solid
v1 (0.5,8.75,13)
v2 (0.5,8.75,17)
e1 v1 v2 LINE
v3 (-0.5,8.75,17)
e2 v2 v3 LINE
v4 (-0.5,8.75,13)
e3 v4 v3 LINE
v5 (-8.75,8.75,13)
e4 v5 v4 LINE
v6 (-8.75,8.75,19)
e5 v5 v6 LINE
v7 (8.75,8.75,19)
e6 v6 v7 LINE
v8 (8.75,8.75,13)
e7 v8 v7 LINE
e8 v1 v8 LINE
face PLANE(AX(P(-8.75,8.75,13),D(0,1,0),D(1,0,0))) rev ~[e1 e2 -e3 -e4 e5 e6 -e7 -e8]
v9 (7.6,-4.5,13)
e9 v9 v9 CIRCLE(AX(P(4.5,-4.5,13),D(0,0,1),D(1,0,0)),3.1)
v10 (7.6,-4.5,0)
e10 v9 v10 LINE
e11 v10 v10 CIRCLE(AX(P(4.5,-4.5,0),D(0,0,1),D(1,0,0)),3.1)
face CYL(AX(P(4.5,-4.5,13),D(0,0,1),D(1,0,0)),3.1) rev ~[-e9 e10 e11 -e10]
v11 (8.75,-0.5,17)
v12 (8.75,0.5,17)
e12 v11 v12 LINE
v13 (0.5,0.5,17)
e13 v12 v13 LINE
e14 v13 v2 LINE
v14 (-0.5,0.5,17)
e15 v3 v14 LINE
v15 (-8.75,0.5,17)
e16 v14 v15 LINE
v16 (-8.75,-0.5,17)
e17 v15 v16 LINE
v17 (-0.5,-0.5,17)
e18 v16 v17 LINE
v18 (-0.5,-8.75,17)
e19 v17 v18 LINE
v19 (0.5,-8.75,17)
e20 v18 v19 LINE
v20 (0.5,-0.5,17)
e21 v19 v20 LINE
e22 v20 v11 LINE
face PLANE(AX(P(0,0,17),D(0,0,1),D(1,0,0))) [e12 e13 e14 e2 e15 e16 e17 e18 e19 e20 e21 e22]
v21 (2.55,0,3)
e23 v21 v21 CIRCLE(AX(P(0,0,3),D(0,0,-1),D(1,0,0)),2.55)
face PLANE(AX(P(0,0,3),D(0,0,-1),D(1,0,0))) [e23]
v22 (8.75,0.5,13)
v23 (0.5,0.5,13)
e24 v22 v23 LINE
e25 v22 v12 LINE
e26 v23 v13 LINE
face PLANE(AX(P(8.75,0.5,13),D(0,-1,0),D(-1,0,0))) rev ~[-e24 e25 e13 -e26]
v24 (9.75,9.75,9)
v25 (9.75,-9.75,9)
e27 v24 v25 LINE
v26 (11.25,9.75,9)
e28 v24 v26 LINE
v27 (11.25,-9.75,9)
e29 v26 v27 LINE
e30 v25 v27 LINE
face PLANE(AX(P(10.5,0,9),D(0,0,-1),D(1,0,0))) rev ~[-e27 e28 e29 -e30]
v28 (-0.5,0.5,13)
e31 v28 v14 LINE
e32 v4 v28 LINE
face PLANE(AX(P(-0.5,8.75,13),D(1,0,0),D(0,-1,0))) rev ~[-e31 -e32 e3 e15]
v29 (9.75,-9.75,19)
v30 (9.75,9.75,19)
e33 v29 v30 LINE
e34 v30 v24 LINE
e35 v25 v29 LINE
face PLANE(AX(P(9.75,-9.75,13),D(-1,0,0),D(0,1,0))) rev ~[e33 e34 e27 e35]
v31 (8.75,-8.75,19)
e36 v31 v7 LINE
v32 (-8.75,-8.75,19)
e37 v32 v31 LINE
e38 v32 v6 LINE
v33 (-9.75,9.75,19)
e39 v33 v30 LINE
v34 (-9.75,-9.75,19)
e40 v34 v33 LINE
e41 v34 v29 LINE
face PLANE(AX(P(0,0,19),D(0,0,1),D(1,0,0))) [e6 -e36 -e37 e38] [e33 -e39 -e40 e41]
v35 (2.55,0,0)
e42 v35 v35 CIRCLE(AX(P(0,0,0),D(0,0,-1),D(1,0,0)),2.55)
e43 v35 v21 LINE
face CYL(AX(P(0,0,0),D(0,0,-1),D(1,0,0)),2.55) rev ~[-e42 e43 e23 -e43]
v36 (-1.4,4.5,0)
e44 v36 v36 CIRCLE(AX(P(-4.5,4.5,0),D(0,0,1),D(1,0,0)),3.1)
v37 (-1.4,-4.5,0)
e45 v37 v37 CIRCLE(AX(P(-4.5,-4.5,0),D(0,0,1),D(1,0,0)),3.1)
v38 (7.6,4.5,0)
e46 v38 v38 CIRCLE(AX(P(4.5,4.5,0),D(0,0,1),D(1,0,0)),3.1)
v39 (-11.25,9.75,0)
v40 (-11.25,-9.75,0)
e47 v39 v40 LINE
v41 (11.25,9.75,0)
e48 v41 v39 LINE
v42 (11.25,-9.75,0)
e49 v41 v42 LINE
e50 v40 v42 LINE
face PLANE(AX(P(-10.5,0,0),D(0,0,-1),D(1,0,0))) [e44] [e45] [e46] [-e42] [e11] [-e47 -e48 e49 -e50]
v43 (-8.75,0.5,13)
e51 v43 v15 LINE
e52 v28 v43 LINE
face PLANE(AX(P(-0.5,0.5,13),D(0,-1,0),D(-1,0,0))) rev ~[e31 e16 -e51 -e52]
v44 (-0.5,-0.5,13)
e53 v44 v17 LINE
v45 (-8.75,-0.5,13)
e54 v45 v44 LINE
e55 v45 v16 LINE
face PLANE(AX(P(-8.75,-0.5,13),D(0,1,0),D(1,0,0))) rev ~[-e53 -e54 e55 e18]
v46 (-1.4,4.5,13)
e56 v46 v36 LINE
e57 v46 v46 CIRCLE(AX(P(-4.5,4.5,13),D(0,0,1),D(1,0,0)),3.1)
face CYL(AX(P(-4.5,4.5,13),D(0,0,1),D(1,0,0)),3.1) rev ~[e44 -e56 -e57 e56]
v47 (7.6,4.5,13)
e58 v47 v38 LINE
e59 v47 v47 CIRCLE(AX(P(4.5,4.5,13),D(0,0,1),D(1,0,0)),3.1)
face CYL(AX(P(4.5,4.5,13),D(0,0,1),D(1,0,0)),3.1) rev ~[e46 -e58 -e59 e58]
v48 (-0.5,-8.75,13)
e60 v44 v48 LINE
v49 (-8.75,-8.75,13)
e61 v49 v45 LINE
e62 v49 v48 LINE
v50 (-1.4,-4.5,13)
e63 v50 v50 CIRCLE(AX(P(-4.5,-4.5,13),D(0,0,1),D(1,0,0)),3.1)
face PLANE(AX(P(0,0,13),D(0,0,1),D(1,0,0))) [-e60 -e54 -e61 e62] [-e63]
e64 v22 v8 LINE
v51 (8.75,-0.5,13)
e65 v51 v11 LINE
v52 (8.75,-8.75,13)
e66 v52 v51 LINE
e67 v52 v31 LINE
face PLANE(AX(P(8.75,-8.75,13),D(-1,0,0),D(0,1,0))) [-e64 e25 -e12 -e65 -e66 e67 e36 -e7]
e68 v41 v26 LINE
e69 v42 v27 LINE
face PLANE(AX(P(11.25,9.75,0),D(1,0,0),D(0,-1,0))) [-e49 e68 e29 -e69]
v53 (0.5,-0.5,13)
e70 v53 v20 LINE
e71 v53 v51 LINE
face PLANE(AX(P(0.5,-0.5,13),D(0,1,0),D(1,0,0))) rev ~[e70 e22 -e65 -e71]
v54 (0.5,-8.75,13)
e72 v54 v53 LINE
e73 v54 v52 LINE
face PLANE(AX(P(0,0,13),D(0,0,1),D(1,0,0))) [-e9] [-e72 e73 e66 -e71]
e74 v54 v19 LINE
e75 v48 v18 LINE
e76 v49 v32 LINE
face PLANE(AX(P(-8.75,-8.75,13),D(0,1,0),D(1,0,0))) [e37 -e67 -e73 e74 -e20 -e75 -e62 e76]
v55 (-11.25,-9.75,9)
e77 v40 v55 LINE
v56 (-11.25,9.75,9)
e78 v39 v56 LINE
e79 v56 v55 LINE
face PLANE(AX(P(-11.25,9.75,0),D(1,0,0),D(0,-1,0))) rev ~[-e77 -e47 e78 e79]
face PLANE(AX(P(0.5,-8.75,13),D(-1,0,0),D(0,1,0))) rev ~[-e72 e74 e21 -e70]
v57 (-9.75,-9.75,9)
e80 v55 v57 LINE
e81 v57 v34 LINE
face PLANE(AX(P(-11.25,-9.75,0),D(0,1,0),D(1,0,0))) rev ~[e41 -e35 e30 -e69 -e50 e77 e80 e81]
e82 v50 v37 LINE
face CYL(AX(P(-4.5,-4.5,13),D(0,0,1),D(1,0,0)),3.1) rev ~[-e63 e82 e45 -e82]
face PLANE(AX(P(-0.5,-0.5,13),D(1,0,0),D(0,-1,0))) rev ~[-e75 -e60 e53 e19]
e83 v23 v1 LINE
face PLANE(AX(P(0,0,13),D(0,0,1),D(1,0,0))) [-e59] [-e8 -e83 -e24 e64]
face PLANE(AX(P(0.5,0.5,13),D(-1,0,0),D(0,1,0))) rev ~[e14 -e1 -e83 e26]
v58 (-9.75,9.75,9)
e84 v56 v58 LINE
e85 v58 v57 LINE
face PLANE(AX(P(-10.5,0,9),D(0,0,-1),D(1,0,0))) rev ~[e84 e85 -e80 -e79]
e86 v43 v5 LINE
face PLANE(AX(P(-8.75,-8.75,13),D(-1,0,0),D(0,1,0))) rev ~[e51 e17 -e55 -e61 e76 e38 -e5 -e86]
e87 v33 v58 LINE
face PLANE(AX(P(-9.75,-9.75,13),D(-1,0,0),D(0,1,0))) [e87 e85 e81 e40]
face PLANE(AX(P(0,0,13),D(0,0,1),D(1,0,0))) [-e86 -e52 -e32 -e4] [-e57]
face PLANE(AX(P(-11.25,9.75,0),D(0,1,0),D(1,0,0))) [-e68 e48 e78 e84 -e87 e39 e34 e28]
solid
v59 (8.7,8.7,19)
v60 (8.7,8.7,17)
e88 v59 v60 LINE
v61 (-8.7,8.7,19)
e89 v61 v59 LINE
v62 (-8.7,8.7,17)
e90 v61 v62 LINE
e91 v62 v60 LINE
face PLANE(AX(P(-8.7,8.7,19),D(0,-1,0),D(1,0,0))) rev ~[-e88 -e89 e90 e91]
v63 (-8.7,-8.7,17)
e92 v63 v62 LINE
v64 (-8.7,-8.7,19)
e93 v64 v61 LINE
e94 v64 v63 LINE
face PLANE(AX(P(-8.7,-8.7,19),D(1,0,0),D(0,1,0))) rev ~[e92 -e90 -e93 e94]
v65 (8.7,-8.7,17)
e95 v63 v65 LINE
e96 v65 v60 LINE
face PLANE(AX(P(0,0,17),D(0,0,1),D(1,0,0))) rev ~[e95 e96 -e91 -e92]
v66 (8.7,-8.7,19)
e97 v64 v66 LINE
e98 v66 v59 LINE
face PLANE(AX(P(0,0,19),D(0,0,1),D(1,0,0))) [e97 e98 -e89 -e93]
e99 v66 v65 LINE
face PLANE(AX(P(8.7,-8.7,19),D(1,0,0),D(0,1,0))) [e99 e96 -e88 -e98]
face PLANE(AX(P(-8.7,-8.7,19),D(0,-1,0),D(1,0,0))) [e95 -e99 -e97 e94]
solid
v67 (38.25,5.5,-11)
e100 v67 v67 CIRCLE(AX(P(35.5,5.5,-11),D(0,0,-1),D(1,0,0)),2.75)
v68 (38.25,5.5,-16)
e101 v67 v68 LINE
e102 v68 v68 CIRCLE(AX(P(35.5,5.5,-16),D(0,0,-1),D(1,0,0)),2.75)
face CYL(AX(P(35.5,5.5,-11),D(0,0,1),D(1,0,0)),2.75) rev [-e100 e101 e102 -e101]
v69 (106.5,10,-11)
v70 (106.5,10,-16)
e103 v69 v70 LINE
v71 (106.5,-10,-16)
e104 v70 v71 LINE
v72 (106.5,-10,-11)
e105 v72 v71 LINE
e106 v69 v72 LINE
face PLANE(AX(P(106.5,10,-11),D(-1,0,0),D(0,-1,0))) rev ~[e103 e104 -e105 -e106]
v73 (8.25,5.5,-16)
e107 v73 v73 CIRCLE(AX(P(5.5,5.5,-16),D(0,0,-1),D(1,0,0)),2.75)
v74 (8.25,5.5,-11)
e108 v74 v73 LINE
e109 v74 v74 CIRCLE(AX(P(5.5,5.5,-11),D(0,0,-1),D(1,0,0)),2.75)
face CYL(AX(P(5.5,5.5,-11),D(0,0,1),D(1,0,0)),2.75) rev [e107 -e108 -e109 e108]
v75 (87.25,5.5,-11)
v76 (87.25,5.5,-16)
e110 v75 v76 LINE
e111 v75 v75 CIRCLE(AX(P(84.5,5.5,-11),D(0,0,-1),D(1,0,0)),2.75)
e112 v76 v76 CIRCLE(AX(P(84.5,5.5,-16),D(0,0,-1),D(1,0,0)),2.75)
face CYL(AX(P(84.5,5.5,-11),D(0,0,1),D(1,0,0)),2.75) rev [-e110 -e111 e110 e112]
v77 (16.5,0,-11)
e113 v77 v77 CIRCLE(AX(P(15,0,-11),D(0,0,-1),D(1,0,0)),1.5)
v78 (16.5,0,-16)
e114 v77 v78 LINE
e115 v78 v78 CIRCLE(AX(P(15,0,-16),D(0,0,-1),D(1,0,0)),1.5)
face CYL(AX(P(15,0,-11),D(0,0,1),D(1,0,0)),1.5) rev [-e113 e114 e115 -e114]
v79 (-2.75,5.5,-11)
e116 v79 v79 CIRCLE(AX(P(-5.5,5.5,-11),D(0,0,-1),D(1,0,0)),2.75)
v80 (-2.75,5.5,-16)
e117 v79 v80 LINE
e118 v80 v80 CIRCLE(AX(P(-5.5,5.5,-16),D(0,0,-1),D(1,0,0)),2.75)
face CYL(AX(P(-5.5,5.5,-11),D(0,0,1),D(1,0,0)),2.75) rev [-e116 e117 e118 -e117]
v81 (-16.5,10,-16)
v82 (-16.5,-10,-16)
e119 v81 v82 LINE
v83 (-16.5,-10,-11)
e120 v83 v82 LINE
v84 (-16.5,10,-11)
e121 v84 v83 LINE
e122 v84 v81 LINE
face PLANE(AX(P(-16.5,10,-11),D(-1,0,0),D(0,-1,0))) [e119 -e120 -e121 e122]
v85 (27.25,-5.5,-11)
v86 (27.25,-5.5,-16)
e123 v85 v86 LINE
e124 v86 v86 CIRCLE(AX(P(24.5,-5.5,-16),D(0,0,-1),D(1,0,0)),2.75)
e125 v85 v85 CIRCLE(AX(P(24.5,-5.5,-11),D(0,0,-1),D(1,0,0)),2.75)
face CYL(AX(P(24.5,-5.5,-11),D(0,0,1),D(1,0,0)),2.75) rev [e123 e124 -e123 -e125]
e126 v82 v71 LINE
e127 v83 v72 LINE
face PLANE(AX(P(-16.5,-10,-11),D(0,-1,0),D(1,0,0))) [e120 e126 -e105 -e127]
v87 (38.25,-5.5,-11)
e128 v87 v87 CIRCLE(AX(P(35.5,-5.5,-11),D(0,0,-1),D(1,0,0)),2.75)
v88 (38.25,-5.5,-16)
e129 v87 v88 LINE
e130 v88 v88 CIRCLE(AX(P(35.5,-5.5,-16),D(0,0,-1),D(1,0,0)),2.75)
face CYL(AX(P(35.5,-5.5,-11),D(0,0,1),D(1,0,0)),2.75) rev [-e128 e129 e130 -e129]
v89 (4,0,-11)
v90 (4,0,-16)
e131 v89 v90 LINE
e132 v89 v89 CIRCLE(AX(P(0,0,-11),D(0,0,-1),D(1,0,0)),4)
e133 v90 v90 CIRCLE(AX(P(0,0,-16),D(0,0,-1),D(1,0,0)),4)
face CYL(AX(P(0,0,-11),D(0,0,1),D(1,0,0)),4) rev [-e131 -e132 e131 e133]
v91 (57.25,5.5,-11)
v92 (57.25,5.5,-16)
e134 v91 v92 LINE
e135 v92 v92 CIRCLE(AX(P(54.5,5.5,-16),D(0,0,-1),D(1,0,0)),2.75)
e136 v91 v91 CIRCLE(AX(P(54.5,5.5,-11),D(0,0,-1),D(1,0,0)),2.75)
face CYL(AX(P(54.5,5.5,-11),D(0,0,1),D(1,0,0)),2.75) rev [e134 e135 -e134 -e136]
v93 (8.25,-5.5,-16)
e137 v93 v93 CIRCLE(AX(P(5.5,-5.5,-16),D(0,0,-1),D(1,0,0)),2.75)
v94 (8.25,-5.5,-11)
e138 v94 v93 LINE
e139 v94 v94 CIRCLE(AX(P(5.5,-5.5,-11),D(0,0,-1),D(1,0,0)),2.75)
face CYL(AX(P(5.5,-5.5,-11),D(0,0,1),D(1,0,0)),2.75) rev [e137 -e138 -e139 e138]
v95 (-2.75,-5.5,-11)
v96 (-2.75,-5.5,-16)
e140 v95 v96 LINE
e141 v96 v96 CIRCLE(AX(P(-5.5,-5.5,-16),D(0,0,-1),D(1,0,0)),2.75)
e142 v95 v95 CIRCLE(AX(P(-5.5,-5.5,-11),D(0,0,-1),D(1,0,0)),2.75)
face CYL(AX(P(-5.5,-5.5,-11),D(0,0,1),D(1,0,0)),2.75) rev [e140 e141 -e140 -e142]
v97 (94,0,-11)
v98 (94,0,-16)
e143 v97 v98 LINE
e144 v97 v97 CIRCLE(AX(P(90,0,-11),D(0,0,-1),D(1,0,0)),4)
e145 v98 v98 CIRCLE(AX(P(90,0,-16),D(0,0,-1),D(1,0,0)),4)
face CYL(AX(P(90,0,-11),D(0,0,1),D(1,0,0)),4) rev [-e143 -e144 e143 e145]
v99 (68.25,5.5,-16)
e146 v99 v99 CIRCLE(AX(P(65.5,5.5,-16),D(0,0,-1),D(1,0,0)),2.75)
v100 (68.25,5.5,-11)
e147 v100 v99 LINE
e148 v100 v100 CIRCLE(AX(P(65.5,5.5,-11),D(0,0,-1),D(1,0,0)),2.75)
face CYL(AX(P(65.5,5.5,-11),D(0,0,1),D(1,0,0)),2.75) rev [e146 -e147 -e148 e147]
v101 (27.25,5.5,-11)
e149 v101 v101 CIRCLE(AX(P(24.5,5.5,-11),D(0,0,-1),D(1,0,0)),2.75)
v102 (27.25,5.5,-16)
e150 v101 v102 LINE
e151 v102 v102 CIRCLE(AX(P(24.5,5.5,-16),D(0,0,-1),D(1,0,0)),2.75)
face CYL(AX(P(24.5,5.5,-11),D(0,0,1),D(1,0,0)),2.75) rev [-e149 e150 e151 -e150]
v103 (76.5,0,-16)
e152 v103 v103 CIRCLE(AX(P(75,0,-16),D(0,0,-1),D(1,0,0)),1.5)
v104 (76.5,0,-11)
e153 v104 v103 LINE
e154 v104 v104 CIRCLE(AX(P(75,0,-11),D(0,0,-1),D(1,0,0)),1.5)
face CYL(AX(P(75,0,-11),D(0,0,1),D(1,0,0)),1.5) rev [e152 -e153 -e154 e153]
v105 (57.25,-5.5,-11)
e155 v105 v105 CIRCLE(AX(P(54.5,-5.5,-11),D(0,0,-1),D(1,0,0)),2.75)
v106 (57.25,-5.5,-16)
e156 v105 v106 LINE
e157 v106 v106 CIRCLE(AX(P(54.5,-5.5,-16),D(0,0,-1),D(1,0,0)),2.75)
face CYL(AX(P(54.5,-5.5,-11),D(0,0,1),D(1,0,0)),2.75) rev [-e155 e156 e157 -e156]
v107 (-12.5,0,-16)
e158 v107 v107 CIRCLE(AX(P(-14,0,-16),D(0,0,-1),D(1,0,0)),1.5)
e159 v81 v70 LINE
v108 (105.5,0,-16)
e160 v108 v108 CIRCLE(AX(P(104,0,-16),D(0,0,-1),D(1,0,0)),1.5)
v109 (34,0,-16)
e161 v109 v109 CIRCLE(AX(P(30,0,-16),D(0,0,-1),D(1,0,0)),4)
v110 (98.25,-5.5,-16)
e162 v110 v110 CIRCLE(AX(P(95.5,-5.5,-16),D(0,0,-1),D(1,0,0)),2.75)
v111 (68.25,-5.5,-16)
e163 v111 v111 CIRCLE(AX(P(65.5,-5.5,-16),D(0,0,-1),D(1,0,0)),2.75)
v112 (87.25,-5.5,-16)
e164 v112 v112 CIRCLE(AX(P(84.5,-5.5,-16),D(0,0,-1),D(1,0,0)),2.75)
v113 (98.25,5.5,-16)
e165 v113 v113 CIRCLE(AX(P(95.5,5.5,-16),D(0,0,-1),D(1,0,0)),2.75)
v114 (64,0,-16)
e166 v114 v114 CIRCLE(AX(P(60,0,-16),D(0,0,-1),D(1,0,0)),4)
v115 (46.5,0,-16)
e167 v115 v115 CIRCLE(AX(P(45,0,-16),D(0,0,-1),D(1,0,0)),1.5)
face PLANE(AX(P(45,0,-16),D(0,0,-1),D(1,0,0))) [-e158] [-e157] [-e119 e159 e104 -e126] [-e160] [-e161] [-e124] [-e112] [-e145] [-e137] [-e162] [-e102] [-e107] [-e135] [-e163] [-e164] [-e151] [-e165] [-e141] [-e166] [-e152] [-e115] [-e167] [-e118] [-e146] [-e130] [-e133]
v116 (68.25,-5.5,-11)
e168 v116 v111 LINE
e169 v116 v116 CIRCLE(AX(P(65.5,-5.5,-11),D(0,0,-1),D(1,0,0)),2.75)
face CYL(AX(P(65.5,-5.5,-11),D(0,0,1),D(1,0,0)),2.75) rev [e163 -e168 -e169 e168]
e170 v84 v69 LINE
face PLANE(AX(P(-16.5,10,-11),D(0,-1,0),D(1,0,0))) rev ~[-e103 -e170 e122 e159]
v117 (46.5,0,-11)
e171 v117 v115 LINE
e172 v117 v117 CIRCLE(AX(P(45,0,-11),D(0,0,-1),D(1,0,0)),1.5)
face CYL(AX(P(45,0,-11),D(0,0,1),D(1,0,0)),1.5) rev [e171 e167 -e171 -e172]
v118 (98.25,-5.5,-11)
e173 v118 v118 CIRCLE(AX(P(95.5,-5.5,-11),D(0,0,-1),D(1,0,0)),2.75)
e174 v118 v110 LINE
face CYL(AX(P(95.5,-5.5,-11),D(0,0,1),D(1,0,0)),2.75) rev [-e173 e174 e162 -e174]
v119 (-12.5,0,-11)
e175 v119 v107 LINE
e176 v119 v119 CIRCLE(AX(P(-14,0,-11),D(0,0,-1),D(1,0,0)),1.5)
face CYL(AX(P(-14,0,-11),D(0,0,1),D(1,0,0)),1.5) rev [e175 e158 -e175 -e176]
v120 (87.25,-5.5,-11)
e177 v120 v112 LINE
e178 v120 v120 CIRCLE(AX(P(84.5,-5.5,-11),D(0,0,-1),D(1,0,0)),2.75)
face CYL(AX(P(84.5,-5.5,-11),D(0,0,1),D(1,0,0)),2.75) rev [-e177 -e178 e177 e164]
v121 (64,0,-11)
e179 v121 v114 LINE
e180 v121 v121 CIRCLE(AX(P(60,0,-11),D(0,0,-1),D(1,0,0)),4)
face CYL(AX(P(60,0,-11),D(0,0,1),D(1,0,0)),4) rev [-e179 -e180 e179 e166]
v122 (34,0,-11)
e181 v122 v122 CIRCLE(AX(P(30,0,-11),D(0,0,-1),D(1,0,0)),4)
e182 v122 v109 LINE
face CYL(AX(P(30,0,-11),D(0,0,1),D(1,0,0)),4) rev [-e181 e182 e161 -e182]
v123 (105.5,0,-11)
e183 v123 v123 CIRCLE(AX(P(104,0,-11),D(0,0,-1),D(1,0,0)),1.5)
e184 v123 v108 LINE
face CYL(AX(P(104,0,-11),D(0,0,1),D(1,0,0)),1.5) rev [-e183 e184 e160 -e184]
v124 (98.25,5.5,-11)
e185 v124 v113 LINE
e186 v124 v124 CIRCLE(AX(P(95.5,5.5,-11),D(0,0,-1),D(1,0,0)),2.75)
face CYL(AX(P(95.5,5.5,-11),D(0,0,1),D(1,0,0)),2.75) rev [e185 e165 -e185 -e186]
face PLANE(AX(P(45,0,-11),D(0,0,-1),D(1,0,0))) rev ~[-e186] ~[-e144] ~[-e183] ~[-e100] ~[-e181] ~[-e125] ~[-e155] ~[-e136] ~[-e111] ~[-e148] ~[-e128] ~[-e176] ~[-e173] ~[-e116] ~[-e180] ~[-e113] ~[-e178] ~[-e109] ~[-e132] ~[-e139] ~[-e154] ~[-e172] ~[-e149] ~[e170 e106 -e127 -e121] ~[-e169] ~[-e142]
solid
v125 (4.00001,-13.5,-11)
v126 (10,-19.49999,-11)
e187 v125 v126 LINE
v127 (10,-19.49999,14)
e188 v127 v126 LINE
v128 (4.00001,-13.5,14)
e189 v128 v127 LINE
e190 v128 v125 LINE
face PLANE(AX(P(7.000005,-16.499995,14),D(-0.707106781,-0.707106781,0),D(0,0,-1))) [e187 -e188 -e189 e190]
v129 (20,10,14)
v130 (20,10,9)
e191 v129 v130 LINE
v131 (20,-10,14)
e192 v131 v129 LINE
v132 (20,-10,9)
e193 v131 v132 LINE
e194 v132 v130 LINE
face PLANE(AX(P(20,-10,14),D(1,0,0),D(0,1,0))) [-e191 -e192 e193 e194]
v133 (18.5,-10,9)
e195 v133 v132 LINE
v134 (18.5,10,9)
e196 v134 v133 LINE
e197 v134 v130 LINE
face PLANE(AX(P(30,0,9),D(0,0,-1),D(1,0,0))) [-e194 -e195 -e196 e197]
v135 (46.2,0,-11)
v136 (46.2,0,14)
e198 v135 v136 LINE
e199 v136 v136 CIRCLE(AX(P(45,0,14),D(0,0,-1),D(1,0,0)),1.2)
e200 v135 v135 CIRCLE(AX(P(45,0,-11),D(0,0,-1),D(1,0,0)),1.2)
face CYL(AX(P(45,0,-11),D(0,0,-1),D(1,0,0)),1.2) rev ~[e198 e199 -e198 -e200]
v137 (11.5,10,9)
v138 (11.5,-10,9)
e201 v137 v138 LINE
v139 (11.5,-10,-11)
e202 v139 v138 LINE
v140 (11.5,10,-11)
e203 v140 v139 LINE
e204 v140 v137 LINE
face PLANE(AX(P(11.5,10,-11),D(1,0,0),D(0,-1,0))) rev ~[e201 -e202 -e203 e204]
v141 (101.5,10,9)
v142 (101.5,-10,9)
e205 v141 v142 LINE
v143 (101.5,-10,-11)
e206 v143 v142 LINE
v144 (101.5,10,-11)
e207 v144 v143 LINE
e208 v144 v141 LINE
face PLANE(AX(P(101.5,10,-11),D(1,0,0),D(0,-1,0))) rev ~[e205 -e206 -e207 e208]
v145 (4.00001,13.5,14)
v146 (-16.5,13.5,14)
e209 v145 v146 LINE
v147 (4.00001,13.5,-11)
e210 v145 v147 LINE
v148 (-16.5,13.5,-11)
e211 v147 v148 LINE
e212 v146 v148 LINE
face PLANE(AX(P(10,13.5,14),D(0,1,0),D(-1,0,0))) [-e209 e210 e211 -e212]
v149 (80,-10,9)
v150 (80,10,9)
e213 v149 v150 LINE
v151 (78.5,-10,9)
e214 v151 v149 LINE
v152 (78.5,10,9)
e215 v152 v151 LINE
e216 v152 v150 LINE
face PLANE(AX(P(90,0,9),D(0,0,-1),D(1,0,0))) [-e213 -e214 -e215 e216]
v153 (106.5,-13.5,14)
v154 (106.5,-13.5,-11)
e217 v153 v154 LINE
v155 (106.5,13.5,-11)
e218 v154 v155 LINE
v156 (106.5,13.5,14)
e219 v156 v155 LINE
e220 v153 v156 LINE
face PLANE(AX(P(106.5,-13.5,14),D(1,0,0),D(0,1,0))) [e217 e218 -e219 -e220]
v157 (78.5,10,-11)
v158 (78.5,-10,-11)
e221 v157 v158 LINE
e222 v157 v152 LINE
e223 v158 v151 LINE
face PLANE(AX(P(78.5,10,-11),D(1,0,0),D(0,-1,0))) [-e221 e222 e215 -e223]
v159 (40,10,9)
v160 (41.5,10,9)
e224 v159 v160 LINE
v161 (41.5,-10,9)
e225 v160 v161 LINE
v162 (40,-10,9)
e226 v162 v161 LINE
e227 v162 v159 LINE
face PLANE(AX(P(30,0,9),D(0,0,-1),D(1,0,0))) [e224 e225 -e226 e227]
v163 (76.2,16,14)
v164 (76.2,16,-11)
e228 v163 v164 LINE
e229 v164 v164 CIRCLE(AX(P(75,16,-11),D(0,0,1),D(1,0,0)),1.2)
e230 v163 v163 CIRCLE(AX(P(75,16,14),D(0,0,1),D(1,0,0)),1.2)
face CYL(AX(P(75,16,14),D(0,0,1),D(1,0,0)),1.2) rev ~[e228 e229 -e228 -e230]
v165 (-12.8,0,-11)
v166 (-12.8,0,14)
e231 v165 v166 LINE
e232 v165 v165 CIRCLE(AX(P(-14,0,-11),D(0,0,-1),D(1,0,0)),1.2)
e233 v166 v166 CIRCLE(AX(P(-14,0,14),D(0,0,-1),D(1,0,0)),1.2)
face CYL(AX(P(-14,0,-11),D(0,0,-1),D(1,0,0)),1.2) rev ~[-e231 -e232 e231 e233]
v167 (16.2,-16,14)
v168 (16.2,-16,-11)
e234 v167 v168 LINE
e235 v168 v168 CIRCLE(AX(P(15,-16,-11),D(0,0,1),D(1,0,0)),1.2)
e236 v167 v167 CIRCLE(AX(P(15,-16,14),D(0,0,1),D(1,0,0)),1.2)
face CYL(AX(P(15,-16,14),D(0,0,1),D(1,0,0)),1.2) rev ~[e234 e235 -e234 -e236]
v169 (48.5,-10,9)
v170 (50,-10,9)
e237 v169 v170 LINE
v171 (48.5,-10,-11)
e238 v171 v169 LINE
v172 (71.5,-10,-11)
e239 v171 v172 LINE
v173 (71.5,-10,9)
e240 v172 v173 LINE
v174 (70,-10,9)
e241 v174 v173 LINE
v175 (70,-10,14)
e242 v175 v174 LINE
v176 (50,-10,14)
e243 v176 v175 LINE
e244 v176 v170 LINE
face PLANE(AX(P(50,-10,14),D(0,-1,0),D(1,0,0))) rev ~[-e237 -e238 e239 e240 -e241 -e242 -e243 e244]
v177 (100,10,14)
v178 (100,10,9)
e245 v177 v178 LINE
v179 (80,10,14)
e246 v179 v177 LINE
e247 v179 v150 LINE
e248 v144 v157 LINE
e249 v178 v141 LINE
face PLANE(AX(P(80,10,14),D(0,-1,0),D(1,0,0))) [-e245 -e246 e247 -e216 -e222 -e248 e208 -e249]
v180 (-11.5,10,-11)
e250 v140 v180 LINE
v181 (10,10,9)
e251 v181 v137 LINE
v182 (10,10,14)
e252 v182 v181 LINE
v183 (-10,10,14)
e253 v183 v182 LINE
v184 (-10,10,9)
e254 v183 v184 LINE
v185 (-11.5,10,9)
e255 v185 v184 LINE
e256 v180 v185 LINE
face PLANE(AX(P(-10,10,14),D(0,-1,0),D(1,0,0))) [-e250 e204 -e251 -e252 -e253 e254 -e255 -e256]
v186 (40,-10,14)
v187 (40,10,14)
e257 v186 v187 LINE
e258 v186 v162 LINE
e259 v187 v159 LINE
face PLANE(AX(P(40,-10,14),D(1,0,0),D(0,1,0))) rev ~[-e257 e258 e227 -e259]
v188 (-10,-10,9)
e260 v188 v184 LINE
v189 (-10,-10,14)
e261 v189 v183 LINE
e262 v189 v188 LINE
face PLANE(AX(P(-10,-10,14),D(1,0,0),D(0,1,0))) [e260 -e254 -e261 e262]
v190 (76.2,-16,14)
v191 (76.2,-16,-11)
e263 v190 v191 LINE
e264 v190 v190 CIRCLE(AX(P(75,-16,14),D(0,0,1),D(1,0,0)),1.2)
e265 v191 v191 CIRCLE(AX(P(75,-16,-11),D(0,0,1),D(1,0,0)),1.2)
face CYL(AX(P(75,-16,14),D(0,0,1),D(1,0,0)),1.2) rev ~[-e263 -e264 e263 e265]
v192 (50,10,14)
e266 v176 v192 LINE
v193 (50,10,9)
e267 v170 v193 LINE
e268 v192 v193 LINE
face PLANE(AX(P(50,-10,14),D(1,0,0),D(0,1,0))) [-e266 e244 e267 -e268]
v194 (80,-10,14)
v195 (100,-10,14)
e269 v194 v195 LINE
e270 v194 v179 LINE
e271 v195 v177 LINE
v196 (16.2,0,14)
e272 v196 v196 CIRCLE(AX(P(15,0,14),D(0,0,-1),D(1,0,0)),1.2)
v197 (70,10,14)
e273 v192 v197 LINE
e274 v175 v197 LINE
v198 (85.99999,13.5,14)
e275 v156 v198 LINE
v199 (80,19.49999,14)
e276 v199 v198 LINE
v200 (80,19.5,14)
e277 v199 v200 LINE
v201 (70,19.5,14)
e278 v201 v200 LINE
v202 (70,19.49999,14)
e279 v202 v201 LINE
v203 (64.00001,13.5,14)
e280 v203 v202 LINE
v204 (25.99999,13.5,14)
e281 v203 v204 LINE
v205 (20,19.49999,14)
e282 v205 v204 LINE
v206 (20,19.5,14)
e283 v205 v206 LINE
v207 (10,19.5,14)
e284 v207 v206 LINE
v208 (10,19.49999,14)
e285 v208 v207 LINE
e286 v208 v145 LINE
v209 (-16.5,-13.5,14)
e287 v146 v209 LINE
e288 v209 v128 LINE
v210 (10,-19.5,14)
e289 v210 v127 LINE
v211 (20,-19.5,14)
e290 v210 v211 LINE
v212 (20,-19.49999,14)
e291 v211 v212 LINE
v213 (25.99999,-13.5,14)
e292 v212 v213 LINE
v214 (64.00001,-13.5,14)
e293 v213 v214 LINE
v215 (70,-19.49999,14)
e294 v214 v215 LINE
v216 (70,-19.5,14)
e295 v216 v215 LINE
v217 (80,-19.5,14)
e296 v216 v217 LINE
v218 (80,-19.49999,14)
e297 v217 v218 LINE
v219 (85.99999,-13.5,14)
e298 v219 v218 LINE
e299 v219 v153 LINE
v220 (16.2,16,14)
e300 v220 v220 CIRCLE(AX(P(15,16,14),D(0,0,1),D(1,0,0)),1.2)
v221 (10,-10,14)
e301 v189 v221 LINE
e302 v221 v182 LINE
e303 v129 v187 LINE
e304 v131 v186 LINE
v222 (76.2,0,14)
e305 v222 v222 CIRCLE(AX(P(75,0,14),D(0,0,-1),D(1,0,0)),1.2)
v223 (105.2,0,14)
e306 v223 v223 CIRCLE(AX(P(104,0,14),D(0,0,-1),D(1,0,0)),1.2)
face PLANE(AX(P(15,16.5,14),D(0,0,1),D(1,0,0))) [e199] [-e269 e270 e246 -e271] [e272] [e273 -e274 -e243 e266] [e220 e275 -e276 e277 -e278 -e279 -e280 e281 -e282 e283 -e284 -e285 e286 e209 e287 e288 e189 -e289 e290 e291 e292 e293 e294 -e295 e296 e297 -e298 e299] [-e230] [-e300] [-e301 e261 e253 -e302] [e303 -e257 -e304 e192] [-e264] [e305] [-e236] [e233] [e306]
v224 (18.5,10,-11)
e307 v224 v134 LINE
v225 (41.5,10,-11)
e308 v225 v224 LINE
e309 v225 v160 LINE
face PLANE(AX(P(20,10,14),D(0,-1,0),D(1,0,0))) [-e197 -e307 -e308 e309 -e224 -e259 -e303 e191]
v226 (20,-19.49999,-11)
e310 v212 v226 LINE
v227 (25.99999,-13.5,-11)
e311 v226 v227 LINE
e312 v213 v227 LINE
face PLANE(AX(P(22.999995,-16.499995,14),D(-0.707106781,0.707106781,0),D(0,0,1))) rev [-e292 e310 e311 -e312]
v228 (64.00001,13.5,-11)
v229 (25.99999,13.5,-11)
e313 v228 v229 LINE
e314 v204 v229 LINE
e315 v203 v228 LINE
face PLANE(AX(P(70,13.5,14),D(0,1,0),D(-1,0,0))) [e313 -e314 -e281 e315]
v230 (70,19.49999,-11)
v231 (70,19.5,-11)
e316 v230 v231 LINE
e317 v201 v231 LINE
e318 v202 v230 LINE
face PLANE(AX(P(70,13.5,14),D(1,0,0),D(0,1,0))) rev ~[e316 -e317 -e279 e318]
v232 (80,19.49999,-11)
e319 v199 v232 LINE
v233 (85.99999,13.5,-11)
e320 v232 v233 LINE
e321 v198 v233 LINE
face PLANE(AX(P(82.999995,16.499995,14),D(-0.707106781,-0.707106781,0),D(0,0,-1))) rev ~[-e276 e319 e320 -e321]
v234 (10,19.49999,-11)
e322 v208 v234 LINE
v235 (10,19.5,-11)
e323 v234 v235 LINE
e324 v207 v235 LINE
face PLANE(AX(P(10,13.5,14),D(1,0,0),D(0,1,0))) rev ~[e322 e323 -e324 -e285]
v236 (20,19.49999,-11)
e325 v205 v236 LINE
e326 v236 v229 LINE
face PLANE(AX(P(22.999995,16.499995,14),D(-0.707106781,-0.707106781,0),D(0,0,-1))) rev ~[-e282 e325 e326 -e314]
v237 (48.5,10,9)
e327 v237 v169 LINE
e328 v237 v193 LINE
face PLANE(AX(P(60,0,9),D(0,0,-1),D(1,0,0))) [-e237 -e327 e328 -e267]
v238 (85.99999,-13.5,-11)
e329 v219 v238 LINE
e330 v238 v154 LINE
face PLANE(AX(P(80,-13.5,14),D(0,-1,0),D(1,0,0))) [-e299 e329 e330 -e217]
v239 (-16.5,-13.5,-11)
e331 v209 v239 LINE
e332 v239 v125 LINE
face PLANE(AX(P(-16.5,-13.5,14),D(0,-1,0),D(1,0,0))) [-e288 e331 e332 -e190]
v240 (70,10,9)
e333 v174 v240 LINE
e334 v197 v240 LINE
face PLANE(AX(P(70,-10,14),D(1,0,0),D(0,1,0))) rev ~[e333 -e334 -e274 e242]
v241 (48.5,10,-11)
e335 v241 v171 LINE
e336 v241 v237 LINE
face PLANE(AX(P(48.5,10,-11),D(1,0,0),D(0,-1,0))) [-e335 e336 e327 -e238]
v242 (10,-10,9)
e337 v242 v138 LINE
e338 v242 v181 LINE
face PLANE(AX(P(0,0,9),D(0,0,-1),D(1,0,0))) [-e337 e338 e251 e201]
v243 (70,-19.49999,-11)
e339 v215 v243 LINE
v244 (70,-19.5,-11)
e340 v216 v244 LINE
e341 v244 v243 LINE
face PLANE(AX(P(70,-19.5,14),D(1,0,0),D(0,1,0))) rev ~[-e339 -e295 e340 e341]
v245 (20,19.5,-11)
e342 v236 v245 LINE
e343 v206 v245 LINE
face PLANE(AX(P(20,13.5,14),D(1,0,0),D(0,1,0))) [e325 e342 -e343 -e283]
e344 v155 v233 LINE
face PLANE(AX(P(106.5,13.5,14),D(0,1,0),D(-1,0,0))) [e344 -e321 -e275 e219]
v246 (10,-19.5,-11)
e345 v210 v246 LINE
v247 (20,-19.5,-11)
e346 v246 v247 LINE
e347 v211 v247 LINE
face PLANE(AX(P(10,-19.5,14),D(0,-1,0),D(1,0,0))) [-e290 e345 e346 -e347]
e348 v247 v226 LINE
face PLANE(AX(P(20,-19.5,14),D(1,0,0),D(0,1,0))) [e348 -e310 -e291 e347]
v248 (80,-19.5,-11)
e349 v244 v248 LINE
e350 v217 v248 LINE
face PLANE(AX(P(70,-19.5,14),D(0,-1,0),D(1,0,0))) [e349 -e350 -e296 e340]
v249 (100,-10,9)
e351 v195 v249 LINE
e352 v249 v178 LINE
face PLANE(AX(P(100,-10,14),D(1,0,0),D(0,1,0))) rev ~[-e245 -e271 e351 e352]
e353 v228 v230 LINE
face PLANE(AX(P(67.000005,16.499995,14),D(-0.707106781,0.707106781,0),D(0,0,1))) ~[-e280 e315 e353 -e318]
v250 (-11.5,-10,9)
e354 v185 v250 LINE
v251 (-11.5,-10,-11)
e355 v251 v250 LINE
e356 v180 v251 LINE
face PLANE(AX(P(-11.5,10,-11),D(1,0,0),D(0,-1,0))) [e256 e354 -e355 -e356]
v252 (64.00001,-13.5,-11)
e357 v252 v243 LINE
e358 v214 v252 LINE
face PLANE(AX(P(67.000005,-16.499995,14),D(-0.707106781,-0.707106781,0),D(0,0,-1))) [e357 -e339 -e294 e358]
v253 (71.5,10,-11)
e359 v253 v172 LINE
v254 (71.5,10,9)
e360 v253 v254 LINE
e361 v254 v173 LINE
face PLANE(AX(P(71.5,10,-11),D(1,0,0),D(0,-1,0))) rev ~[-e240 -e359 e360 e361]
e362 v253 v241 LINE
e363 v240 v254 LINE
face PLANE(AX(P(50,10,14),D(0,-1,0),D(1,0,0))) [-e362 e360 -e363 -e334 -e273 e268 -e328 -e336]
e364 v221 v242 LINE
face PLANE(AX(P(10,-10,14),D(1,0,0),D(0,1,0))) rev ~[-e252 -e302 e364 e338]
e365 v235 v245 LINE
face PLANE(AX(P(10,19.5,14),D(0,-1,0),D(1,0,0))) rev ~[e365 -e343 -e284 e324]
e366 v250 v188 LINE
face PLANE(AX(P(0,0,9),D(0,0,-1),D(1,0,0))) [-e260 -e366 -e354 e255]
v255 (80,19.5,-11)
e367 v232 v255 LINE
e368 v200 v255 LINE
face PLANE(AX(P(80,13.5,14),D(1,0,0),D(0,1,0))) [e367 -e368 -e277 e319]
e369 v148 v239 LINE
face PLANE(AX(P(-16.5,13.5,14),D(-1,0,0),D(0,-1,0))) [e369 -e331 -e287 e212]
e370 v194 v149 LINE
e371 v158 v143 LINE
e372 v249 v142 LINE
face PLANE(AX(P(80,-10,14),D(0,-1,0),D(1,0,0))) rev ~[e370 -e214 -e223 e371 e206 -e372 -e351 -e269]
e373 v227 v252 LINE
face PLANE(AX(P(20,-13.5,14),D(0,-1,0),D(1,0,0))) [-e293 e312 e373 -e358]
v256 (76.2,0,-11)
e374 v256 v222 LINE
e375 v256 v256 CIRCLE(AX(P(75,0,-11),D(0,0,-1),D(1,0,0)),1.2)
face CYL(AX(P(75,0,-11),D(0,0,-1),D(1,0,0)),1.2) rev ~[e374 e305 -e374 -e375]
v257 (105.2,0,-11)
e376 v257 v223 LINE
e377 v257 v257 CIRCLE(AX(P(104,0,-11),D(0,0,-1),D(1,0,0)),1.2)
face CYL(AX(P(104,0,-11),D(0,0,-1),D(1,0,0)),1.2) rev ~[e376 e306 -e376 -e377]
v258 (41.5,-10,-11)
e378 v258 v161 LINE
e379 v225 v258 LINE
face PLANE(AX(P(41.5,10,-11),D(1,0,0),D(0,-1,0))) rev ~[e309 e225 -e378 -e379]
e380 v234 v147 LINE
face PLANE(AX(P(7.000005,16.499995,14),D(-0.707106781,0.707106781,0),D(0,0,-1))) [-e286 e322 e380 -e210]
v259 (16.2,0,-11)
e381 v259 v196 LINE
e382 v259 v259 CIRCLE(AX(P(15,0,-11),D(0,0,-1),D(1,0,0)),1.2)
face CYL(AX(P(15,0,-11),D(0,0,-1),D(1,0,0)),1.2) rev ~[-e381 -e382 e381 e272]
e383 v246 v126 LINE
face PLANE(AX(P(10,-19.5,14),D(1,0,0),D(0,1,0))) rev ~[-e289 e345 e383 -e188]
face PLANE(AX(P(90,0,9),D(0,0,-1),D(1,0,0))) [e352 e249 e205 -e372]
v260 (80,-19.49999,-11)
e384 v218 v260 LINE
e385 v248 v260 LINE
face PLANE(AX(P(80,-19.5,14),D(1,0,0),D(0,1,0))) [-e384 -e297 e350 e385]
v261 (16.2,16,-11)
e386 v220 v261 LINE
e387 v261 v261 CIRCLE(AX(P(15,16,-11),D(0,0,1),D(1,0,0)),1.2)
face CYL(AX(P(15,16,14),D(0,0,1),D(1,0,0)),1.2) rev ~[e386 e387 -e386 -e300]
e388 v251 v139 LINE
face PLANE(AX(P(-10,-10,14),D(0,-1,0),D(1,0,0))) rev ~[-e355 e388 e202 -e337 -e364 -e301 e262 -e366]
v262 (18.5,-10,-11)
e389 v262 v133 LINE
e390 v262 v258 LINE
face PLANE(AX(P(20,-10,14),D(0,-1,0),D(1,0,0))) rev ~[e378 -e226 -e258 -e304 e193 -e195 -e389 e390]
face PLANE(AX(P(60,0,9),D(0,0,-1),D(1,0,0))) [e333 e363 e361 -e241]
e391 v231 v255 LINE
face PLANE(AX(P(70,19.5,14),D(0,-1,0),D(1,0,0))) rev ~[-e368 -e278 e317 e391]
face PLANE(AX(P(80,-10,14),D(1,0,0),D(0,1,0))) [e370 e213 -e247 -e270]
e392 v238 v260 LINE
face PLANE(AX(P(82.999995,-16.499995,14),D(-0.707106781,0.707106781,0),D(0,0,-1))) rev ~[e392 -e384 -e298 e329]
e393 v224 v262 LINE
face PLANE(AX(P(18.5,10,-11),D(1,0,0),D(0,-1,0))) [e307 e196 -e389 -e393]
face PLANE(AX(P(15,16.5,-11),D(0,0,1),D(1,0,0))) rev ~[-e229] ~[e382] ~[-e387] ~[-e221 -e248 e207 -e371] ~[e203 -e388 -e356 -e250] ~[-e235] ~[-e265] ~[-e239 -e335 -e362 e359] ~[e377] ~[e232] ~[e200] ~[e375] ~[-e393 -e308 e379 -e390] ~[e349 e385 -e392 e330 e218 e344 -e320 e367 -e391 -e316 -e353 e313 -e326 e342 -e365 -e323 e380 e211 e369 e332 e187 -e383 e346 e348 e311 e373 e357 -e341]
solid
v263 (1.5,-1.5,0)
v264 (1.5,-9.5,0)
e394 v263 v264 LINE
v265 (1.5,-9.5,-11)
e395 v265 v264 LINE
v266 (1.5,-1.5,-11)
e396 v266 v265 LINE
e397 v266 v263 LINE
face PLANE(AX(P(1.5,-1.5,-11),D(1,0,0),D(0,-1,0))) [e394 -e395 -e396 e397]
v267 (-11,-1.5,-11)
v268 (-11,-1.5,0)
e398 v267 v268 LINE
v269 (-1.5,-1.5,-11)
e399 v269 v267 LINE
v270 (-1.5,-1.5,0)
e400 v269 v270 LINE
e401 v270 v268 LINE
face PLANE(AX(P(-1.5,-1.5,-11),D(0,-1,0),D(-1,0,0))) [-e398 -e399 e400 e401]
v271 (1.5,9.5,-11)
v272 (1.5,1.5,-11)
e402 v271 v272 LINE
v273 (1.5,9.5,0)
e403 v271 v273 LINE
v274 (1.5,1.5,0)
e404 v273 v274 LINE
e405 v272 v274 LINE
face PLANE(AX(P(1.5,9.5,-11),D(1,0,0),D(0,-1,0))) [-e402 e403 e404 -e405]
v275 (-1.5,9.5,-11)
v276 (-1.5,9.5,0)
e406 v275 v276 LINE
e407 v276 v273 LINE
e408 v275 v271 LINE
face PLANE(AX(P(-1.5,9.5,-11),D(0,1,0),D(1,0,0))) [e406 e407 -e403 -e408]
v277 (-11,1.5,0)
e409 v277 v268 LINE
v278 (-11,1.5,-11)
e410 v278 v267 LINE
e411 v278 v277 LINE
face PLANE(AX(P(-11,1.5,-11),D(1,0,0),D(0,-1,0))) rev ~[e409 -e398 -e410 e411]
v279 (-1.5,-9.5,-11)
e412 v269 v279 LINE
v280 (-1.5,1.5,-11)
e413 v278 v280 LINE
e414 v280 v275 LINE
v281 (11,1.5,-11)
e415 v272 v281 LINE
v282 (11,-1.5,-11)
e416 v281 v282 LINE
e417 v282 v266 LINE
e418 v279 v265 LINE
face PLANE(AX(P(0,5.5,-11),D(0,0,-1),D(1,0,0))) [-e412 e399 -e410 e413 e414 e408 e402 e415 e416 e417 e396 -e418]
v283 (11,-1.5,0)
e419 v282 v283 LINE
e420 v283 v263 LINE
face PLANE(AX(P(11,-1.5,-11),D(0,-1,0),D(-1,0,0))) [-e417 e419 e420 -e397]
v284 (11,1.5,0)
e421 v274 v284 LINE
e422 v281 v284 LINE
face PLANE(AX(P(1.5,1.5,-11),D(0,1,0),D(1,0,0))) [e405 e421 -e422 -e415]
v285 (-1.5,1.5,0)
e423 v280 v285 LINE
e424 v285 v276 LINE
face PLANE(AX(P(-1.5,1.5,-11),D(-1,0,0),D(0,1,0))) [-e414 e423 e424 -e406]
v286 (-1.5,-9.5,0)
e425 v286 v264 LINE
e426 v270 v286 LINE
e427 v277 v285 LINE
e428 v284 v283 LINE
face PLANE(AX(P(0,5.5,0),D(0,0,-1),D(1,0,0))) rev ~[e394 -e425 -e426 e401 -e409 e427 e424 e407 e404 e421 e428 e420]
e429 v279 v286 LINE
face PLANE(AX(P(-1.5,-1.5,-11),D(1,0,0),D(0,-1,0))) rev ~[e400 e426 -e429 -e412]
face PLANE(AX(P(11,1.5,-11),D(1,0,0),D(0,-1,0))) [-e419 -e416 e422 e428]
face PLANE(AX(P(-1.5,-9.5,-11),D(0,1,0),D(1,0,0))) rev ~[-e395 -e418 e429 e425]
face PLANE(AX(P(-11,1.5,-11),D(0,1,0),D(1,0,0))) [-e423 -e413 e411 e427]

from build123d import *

# Parameters (mm, degrees)
F0_W      = 19.5
F0_H      = 19.5
F1_DEPTH  = 13
F2_W      = 19.5
F2_H      = 19.5
F2_W_2    = 17.5
F2_H_2    = 17.5
F3_DEPTH  = 6
F5_DEPTH  = 4
F6_R      = 3.1
F7_DEPTH  = 19
F8_W      = 1.5
F8_H      = 19.5
F9_DEPTH  = 9
F10_R     = 2.55
F11_DEPTH = 3
F13_W     = 10
F13_H     = 6
F13_W_2   = 20
F13_H_2   = 20
F14_DEPTH = 25
F15_W     = 23
F15_H     = 20
F16_DEPTH = 20
F17_R     = 1.2
F18_DEPTH = 30
F19_R     = 1.2
F20_DEPTH = 30.001
F21_W     = 123
F21_H     = 20
F21_R     = 2.75
F21_R_2   = 1.5
F21_R_3   = 4
F22_DEPTH = 5
F23_SIZE  = 5.99999
F25_W     = 3
F25_H     = 8
F25_H_2   = 3
F25_W_2   = 9.5
F26_DEPTH = 11
F27_W     = 17.4
F27_H     = 17.4
F28_DEPTH = 2


# Not quite as in the source:
# - a fillet or chamfer is up to 0.001 mm smaller than in the source, because OpenCascade refuses the exact size


with BuildPart() as f1:
    # F0 (on Top) → F1 (new body)
    with BuildSketch(Plane.XY):
        Rectangle(F0_W, F0_H)
    extrude(amount=F1_DEPTH)

    # F2 (on face) → F3 (join)
    with BuildSketch(Plane.XY.offset(13)):
        Rectangle(F2_W, F2_H)
        Rectangle(F2_W_2, F2_H_2, mode=Mode.SUBTRACT)
    extrude(amount=F3_DEPTH)

    # F4 (on face) → F5 (join)
    with BuildSketch(Plane.XY.offset(13)):
        Polygon((0.5, 8.75), (-0.5, 8.75), (-0.5, 0.5), (-8.75, 0.5), (-8.75, -0.5), (-0.5, -0.5), (-0.5, -8.75), (0.5, -8.75), (0.5, -0.5), (8.75, -0.5), (8.75, 0.5), (0.5, 0.5), align=None)
    extrude(amount=F5_DEPTH)

    # F6 (on face) → F7 (cut)
    with BuildSketch(Plane.XY.offset(13)):
        with Locations((-4.5, 4.5)):
            Circle(F6_R)
        with Locations((-4.5, -4.5)):
            Circle(F6_R)
        with Locations((4.5, 4.5)):
            Circle(F6_R)
        with Locations((4.5, -4.5)):
            Circle(F6_R)
    extrude(amount=-F7_DEPTH, mode=Mode.SUBTRACT)

    # F8 (on face) → F9 (join)
    with BuildSketch(Plane(origin=(0, 0, 0), x_dir=(1, 0, 0), z_dir=(0, 0, -1))):
        with Locations((-10.5, 0)):
            Rectangle(F8_W, F8_H)
        with Locations((10.5, 0)):
            Rectangle(F8_W, F8_H)
    extrude(amount=-F9_DEPTH)

    # F10 (on face) → F11 (cut)
    with BuildSketch(Plane(origin=(0, 0, 0), x_dir=(1, 0, 0), z_dir=(0, 0, -1))):
        Circle(F10_R)
    extrude(amount=-F11_DEPTH, mode=Mode.SUBTRACT)


with BuildPart() as f14:
    # F13 (on offset) → F14 (new body)
    with BuildSketch(Plane.XY.offset(14)):
        with Locations((15, 16.5)):
            Rectangle(F13_W, F13_H)
        Polygon((20, 13.5), (10, 13.5), (-16.5, 13.5), (-16.5, -13.5), (10, -13.5), (20, -13.5), (70, -13.5), (80, -13.5), (106.5, -13.5), (106.5, 13.5), (80, 13.5), (70, 13.5), align=None)
        Rectangle(F13_W_2, F13_H_2, mode=Mode.SUBTRACT)
        with Locations((30, 0)):
            Rectangle(F13_W_2, F13_H_2, mode=Mode.SUBTRACT)
        with Locations((60, 0)):
            Rectangle(F13_W_2, F13_H_2, mode=Mode.SUBTRACT)
        with Locations((90, 0)):
            Rectangle(F13_W_2, F13_H_2, mode=Mode.SUBTRACT)
        with Locations((75, 16.5)):
            Rectangle(F13_W, F13_H)
        with Locations((15, -16.5)):
            Rectangle(F13_W, F13_H)
        with Locations((75, -16.5)):
            Rectangle(F13_W, F13_H)
    extrude(amount=-F14_DEPTH)

    # F15 (on face) → F16 (cut)
    with BuildSketch(Plane(origin=(0, 0, -11), x_dir=(1, 0, 0), z_dir=(0, 0, -1))):
        Rectangle(F15_W, F15_H)
        with Locations((30, 0)):
            Rectangle(F15_W, F15_H)
        with Locations((60, 0)):
            Rectangle(F15_W, F15_H)
        with Locations((90, 0)):
            Rectangle(F15_W, F15_H)
    extrude(amount=-F16_DEPTH, mode=Mode.SUBTRACT)

    # F17 (on face) → F18 (cut)
    with BuildSketch(Plane.XY.offset(14)):
        with Locations((15, 16)):
            Circle(F17_R)
        with Locations((15, -16)):
            Circle(F17_R)
        with Locations((75, 16)):
            Circle(F17_R)
        with Locations((75, -16)):
            Circle(F17_R)
    extrude(amount=-F18_DEPTH, mode=Mode.SUBTRACT)

    # F19 (on face) → F20 (cut, through all)
    with BuildSketch(Plane(origin=(0, 0, -11), x_dir=(1, 0, 0), z_dir=(0, 0, -1))):
        with Locations((-14, 0)):
            Circle(F19_R)
        with Locations((15, 0)):
            Circle(F19_R)
        with Locations((45, 0)):
            Circle(F19_R)
        with Locations((75, 0)):
            Circle(F19_R)
        with Locations((104, 0)):
            Circle(F19_R)
    extrude(amount=-F20_DEPTH, mode=Mode.SUBTRACT)

    # F23 (size 6 in the source; OpenCascade refuses exactly that, so slightly less here)
    f23_edges = [f14.edges().sort_by_distance(p)[0] for p in [
        (10, -13.5, 1.5),
        (20, -13.5, 1.5),
        (70, -13.5, 1.5),
        (80, -13.5, 1.5),
        (10, 13.5, 1.5),
        (20, 13.5, 1.5),
        (70, 13.5, 1.5),
        (80, 13.5, 1.5),
    ]]
    chamfer(f23_edges, length=F23_SIZE)


with BuildPart() as f22:
    # F21 (on face) → F22 (new body)
    with BuildSketch(Plane(origin=(0, 0, -11), x_dir=(1, 0, 0), z_dir=(0, 0, -1))):
        with Locations((45, 0)):
            Rectangle(F21_W, F21_H)
        with Locations((-5.5, -5.5)):
            Circle(F21_R, mode=Mode.SUBTRACT)
        with Locations((5.5, -5.5)):
            Circle(F21_R, mode=Mode.SUBTRACT)
        with Locations((24.5, -5.5)):
            Circle(F21_R, mode=Mode.SUBTRACT)
        with Locations((35.5, -5.5)):
            Circle(F21_R, mode=Mode.SUBTRACT)
        with Locations((54.5, -5.5)):
            Circle(F21_R, mode=Mode.SUBTRACT)
        with Locations((65.5, -5.5)):
            Circle(F21_R, mode=Mode.SUBTRACT)
        with Locations((84.5, -5.5)):
            Circle(F21_R, mode=Mode.SUBTRACT)
        with Locations((95.5, -5.5)):
            Circle(F21_R, mode=Mode.SUBTRACT)
        with Locations((-14, 0)):
            Circle(F21_R_2, mode=Mode.SUBTRACT)
        Circle(F21_R_3, mode=Mode.SUBTRACT)
        with Locations((15, 0)):
            Circle(F21_R_2, mode=Mode.SUBTRACT)
        with Locations((30, 0)):
            Circle(F21_R_3, mode=Mode.SUBTRACT)
        with Locations((-5.5, 5.5)):
            Circle(F21_R, mode=Mode.SUBTRACT)
        with Locations((5.5, 5.5)):
            Circle(F21_R, mode=Mode.SUBTRACT)
        with Locations((24.5, 5.5)):
            Circle(F21_R, mode=Mode.SUBTRACT)
        with Locations((35.5, 5.5)):
            Circle(F21_R, mode=Mode.SUBTRACT)
        with Locations((45, 0)):
            Circle(F21_R_2, mode=Mode.SUBTRACT)
        with Locations((60, 0)):
            Circle(F21_R_3, mode=Mode.SUBTRACT)
        with Locations((75, 0)):
            Circle(F21_R_2, mode=Mode.SUBTRACT)
        with Locations((90, 0)):
            Circle(F21_R_3, mode=Mode.SUBTRACT)
        with Locations((104, 0)):
            Circle(F21_R_2, mode=Mode.SUBTRACT)
        with Locations((54.5, 5.5)):
            Circle(F21_R, mode=Mode.SUBTRACT)
        with Locations((65.5, 5.5)):
            Circle(F21_R, mode=Mode.SUBTRACT)
        with Locations((84.5, 5.5)):
            Circle(F21_R, mode=Mode.SUBTRACT)
        with Locations((95.5, 5.5)):
            Circle(F21_R, mode=Mode.SUBTRACT)
    extrude(amount=F22_DEPTH)


with BuildPart() as f26:
    # F25 (on offset) → F26 (new body)
    with BuildSketch(Plane(origin=(0, 0, -11), x_dir=(1, 0, 0), z_dir=(0, 0, -1))):
        with Locations((0, -5.5)):
            Rectangle(F25_W, F25_H)
        Rectangle(F25_W, F25_H_2)
        with Locations((6.25, 0)):
            Rectangle(F25_W_2, F25_H_2)
        with Locations((-6.25, 0)):
            Rectangle(F25_W_2, F25_H_2)
        with Locations((0, 5.5)):
            Rectangle(F25_W, F25_H)
    extrude(amount=-F26_DEPTH)


with BuildPart() as f28:
    # F27 (on face) → F28 (new body)
    with BuildSketch(Plane.XY.offset(19)):
        Rectangle(F27_W, F27_H)
    extrude(amount=-F28_DEPTH)


solid = Compound([f1.part, f14.part, f22.part, f26.part, f28.part])
